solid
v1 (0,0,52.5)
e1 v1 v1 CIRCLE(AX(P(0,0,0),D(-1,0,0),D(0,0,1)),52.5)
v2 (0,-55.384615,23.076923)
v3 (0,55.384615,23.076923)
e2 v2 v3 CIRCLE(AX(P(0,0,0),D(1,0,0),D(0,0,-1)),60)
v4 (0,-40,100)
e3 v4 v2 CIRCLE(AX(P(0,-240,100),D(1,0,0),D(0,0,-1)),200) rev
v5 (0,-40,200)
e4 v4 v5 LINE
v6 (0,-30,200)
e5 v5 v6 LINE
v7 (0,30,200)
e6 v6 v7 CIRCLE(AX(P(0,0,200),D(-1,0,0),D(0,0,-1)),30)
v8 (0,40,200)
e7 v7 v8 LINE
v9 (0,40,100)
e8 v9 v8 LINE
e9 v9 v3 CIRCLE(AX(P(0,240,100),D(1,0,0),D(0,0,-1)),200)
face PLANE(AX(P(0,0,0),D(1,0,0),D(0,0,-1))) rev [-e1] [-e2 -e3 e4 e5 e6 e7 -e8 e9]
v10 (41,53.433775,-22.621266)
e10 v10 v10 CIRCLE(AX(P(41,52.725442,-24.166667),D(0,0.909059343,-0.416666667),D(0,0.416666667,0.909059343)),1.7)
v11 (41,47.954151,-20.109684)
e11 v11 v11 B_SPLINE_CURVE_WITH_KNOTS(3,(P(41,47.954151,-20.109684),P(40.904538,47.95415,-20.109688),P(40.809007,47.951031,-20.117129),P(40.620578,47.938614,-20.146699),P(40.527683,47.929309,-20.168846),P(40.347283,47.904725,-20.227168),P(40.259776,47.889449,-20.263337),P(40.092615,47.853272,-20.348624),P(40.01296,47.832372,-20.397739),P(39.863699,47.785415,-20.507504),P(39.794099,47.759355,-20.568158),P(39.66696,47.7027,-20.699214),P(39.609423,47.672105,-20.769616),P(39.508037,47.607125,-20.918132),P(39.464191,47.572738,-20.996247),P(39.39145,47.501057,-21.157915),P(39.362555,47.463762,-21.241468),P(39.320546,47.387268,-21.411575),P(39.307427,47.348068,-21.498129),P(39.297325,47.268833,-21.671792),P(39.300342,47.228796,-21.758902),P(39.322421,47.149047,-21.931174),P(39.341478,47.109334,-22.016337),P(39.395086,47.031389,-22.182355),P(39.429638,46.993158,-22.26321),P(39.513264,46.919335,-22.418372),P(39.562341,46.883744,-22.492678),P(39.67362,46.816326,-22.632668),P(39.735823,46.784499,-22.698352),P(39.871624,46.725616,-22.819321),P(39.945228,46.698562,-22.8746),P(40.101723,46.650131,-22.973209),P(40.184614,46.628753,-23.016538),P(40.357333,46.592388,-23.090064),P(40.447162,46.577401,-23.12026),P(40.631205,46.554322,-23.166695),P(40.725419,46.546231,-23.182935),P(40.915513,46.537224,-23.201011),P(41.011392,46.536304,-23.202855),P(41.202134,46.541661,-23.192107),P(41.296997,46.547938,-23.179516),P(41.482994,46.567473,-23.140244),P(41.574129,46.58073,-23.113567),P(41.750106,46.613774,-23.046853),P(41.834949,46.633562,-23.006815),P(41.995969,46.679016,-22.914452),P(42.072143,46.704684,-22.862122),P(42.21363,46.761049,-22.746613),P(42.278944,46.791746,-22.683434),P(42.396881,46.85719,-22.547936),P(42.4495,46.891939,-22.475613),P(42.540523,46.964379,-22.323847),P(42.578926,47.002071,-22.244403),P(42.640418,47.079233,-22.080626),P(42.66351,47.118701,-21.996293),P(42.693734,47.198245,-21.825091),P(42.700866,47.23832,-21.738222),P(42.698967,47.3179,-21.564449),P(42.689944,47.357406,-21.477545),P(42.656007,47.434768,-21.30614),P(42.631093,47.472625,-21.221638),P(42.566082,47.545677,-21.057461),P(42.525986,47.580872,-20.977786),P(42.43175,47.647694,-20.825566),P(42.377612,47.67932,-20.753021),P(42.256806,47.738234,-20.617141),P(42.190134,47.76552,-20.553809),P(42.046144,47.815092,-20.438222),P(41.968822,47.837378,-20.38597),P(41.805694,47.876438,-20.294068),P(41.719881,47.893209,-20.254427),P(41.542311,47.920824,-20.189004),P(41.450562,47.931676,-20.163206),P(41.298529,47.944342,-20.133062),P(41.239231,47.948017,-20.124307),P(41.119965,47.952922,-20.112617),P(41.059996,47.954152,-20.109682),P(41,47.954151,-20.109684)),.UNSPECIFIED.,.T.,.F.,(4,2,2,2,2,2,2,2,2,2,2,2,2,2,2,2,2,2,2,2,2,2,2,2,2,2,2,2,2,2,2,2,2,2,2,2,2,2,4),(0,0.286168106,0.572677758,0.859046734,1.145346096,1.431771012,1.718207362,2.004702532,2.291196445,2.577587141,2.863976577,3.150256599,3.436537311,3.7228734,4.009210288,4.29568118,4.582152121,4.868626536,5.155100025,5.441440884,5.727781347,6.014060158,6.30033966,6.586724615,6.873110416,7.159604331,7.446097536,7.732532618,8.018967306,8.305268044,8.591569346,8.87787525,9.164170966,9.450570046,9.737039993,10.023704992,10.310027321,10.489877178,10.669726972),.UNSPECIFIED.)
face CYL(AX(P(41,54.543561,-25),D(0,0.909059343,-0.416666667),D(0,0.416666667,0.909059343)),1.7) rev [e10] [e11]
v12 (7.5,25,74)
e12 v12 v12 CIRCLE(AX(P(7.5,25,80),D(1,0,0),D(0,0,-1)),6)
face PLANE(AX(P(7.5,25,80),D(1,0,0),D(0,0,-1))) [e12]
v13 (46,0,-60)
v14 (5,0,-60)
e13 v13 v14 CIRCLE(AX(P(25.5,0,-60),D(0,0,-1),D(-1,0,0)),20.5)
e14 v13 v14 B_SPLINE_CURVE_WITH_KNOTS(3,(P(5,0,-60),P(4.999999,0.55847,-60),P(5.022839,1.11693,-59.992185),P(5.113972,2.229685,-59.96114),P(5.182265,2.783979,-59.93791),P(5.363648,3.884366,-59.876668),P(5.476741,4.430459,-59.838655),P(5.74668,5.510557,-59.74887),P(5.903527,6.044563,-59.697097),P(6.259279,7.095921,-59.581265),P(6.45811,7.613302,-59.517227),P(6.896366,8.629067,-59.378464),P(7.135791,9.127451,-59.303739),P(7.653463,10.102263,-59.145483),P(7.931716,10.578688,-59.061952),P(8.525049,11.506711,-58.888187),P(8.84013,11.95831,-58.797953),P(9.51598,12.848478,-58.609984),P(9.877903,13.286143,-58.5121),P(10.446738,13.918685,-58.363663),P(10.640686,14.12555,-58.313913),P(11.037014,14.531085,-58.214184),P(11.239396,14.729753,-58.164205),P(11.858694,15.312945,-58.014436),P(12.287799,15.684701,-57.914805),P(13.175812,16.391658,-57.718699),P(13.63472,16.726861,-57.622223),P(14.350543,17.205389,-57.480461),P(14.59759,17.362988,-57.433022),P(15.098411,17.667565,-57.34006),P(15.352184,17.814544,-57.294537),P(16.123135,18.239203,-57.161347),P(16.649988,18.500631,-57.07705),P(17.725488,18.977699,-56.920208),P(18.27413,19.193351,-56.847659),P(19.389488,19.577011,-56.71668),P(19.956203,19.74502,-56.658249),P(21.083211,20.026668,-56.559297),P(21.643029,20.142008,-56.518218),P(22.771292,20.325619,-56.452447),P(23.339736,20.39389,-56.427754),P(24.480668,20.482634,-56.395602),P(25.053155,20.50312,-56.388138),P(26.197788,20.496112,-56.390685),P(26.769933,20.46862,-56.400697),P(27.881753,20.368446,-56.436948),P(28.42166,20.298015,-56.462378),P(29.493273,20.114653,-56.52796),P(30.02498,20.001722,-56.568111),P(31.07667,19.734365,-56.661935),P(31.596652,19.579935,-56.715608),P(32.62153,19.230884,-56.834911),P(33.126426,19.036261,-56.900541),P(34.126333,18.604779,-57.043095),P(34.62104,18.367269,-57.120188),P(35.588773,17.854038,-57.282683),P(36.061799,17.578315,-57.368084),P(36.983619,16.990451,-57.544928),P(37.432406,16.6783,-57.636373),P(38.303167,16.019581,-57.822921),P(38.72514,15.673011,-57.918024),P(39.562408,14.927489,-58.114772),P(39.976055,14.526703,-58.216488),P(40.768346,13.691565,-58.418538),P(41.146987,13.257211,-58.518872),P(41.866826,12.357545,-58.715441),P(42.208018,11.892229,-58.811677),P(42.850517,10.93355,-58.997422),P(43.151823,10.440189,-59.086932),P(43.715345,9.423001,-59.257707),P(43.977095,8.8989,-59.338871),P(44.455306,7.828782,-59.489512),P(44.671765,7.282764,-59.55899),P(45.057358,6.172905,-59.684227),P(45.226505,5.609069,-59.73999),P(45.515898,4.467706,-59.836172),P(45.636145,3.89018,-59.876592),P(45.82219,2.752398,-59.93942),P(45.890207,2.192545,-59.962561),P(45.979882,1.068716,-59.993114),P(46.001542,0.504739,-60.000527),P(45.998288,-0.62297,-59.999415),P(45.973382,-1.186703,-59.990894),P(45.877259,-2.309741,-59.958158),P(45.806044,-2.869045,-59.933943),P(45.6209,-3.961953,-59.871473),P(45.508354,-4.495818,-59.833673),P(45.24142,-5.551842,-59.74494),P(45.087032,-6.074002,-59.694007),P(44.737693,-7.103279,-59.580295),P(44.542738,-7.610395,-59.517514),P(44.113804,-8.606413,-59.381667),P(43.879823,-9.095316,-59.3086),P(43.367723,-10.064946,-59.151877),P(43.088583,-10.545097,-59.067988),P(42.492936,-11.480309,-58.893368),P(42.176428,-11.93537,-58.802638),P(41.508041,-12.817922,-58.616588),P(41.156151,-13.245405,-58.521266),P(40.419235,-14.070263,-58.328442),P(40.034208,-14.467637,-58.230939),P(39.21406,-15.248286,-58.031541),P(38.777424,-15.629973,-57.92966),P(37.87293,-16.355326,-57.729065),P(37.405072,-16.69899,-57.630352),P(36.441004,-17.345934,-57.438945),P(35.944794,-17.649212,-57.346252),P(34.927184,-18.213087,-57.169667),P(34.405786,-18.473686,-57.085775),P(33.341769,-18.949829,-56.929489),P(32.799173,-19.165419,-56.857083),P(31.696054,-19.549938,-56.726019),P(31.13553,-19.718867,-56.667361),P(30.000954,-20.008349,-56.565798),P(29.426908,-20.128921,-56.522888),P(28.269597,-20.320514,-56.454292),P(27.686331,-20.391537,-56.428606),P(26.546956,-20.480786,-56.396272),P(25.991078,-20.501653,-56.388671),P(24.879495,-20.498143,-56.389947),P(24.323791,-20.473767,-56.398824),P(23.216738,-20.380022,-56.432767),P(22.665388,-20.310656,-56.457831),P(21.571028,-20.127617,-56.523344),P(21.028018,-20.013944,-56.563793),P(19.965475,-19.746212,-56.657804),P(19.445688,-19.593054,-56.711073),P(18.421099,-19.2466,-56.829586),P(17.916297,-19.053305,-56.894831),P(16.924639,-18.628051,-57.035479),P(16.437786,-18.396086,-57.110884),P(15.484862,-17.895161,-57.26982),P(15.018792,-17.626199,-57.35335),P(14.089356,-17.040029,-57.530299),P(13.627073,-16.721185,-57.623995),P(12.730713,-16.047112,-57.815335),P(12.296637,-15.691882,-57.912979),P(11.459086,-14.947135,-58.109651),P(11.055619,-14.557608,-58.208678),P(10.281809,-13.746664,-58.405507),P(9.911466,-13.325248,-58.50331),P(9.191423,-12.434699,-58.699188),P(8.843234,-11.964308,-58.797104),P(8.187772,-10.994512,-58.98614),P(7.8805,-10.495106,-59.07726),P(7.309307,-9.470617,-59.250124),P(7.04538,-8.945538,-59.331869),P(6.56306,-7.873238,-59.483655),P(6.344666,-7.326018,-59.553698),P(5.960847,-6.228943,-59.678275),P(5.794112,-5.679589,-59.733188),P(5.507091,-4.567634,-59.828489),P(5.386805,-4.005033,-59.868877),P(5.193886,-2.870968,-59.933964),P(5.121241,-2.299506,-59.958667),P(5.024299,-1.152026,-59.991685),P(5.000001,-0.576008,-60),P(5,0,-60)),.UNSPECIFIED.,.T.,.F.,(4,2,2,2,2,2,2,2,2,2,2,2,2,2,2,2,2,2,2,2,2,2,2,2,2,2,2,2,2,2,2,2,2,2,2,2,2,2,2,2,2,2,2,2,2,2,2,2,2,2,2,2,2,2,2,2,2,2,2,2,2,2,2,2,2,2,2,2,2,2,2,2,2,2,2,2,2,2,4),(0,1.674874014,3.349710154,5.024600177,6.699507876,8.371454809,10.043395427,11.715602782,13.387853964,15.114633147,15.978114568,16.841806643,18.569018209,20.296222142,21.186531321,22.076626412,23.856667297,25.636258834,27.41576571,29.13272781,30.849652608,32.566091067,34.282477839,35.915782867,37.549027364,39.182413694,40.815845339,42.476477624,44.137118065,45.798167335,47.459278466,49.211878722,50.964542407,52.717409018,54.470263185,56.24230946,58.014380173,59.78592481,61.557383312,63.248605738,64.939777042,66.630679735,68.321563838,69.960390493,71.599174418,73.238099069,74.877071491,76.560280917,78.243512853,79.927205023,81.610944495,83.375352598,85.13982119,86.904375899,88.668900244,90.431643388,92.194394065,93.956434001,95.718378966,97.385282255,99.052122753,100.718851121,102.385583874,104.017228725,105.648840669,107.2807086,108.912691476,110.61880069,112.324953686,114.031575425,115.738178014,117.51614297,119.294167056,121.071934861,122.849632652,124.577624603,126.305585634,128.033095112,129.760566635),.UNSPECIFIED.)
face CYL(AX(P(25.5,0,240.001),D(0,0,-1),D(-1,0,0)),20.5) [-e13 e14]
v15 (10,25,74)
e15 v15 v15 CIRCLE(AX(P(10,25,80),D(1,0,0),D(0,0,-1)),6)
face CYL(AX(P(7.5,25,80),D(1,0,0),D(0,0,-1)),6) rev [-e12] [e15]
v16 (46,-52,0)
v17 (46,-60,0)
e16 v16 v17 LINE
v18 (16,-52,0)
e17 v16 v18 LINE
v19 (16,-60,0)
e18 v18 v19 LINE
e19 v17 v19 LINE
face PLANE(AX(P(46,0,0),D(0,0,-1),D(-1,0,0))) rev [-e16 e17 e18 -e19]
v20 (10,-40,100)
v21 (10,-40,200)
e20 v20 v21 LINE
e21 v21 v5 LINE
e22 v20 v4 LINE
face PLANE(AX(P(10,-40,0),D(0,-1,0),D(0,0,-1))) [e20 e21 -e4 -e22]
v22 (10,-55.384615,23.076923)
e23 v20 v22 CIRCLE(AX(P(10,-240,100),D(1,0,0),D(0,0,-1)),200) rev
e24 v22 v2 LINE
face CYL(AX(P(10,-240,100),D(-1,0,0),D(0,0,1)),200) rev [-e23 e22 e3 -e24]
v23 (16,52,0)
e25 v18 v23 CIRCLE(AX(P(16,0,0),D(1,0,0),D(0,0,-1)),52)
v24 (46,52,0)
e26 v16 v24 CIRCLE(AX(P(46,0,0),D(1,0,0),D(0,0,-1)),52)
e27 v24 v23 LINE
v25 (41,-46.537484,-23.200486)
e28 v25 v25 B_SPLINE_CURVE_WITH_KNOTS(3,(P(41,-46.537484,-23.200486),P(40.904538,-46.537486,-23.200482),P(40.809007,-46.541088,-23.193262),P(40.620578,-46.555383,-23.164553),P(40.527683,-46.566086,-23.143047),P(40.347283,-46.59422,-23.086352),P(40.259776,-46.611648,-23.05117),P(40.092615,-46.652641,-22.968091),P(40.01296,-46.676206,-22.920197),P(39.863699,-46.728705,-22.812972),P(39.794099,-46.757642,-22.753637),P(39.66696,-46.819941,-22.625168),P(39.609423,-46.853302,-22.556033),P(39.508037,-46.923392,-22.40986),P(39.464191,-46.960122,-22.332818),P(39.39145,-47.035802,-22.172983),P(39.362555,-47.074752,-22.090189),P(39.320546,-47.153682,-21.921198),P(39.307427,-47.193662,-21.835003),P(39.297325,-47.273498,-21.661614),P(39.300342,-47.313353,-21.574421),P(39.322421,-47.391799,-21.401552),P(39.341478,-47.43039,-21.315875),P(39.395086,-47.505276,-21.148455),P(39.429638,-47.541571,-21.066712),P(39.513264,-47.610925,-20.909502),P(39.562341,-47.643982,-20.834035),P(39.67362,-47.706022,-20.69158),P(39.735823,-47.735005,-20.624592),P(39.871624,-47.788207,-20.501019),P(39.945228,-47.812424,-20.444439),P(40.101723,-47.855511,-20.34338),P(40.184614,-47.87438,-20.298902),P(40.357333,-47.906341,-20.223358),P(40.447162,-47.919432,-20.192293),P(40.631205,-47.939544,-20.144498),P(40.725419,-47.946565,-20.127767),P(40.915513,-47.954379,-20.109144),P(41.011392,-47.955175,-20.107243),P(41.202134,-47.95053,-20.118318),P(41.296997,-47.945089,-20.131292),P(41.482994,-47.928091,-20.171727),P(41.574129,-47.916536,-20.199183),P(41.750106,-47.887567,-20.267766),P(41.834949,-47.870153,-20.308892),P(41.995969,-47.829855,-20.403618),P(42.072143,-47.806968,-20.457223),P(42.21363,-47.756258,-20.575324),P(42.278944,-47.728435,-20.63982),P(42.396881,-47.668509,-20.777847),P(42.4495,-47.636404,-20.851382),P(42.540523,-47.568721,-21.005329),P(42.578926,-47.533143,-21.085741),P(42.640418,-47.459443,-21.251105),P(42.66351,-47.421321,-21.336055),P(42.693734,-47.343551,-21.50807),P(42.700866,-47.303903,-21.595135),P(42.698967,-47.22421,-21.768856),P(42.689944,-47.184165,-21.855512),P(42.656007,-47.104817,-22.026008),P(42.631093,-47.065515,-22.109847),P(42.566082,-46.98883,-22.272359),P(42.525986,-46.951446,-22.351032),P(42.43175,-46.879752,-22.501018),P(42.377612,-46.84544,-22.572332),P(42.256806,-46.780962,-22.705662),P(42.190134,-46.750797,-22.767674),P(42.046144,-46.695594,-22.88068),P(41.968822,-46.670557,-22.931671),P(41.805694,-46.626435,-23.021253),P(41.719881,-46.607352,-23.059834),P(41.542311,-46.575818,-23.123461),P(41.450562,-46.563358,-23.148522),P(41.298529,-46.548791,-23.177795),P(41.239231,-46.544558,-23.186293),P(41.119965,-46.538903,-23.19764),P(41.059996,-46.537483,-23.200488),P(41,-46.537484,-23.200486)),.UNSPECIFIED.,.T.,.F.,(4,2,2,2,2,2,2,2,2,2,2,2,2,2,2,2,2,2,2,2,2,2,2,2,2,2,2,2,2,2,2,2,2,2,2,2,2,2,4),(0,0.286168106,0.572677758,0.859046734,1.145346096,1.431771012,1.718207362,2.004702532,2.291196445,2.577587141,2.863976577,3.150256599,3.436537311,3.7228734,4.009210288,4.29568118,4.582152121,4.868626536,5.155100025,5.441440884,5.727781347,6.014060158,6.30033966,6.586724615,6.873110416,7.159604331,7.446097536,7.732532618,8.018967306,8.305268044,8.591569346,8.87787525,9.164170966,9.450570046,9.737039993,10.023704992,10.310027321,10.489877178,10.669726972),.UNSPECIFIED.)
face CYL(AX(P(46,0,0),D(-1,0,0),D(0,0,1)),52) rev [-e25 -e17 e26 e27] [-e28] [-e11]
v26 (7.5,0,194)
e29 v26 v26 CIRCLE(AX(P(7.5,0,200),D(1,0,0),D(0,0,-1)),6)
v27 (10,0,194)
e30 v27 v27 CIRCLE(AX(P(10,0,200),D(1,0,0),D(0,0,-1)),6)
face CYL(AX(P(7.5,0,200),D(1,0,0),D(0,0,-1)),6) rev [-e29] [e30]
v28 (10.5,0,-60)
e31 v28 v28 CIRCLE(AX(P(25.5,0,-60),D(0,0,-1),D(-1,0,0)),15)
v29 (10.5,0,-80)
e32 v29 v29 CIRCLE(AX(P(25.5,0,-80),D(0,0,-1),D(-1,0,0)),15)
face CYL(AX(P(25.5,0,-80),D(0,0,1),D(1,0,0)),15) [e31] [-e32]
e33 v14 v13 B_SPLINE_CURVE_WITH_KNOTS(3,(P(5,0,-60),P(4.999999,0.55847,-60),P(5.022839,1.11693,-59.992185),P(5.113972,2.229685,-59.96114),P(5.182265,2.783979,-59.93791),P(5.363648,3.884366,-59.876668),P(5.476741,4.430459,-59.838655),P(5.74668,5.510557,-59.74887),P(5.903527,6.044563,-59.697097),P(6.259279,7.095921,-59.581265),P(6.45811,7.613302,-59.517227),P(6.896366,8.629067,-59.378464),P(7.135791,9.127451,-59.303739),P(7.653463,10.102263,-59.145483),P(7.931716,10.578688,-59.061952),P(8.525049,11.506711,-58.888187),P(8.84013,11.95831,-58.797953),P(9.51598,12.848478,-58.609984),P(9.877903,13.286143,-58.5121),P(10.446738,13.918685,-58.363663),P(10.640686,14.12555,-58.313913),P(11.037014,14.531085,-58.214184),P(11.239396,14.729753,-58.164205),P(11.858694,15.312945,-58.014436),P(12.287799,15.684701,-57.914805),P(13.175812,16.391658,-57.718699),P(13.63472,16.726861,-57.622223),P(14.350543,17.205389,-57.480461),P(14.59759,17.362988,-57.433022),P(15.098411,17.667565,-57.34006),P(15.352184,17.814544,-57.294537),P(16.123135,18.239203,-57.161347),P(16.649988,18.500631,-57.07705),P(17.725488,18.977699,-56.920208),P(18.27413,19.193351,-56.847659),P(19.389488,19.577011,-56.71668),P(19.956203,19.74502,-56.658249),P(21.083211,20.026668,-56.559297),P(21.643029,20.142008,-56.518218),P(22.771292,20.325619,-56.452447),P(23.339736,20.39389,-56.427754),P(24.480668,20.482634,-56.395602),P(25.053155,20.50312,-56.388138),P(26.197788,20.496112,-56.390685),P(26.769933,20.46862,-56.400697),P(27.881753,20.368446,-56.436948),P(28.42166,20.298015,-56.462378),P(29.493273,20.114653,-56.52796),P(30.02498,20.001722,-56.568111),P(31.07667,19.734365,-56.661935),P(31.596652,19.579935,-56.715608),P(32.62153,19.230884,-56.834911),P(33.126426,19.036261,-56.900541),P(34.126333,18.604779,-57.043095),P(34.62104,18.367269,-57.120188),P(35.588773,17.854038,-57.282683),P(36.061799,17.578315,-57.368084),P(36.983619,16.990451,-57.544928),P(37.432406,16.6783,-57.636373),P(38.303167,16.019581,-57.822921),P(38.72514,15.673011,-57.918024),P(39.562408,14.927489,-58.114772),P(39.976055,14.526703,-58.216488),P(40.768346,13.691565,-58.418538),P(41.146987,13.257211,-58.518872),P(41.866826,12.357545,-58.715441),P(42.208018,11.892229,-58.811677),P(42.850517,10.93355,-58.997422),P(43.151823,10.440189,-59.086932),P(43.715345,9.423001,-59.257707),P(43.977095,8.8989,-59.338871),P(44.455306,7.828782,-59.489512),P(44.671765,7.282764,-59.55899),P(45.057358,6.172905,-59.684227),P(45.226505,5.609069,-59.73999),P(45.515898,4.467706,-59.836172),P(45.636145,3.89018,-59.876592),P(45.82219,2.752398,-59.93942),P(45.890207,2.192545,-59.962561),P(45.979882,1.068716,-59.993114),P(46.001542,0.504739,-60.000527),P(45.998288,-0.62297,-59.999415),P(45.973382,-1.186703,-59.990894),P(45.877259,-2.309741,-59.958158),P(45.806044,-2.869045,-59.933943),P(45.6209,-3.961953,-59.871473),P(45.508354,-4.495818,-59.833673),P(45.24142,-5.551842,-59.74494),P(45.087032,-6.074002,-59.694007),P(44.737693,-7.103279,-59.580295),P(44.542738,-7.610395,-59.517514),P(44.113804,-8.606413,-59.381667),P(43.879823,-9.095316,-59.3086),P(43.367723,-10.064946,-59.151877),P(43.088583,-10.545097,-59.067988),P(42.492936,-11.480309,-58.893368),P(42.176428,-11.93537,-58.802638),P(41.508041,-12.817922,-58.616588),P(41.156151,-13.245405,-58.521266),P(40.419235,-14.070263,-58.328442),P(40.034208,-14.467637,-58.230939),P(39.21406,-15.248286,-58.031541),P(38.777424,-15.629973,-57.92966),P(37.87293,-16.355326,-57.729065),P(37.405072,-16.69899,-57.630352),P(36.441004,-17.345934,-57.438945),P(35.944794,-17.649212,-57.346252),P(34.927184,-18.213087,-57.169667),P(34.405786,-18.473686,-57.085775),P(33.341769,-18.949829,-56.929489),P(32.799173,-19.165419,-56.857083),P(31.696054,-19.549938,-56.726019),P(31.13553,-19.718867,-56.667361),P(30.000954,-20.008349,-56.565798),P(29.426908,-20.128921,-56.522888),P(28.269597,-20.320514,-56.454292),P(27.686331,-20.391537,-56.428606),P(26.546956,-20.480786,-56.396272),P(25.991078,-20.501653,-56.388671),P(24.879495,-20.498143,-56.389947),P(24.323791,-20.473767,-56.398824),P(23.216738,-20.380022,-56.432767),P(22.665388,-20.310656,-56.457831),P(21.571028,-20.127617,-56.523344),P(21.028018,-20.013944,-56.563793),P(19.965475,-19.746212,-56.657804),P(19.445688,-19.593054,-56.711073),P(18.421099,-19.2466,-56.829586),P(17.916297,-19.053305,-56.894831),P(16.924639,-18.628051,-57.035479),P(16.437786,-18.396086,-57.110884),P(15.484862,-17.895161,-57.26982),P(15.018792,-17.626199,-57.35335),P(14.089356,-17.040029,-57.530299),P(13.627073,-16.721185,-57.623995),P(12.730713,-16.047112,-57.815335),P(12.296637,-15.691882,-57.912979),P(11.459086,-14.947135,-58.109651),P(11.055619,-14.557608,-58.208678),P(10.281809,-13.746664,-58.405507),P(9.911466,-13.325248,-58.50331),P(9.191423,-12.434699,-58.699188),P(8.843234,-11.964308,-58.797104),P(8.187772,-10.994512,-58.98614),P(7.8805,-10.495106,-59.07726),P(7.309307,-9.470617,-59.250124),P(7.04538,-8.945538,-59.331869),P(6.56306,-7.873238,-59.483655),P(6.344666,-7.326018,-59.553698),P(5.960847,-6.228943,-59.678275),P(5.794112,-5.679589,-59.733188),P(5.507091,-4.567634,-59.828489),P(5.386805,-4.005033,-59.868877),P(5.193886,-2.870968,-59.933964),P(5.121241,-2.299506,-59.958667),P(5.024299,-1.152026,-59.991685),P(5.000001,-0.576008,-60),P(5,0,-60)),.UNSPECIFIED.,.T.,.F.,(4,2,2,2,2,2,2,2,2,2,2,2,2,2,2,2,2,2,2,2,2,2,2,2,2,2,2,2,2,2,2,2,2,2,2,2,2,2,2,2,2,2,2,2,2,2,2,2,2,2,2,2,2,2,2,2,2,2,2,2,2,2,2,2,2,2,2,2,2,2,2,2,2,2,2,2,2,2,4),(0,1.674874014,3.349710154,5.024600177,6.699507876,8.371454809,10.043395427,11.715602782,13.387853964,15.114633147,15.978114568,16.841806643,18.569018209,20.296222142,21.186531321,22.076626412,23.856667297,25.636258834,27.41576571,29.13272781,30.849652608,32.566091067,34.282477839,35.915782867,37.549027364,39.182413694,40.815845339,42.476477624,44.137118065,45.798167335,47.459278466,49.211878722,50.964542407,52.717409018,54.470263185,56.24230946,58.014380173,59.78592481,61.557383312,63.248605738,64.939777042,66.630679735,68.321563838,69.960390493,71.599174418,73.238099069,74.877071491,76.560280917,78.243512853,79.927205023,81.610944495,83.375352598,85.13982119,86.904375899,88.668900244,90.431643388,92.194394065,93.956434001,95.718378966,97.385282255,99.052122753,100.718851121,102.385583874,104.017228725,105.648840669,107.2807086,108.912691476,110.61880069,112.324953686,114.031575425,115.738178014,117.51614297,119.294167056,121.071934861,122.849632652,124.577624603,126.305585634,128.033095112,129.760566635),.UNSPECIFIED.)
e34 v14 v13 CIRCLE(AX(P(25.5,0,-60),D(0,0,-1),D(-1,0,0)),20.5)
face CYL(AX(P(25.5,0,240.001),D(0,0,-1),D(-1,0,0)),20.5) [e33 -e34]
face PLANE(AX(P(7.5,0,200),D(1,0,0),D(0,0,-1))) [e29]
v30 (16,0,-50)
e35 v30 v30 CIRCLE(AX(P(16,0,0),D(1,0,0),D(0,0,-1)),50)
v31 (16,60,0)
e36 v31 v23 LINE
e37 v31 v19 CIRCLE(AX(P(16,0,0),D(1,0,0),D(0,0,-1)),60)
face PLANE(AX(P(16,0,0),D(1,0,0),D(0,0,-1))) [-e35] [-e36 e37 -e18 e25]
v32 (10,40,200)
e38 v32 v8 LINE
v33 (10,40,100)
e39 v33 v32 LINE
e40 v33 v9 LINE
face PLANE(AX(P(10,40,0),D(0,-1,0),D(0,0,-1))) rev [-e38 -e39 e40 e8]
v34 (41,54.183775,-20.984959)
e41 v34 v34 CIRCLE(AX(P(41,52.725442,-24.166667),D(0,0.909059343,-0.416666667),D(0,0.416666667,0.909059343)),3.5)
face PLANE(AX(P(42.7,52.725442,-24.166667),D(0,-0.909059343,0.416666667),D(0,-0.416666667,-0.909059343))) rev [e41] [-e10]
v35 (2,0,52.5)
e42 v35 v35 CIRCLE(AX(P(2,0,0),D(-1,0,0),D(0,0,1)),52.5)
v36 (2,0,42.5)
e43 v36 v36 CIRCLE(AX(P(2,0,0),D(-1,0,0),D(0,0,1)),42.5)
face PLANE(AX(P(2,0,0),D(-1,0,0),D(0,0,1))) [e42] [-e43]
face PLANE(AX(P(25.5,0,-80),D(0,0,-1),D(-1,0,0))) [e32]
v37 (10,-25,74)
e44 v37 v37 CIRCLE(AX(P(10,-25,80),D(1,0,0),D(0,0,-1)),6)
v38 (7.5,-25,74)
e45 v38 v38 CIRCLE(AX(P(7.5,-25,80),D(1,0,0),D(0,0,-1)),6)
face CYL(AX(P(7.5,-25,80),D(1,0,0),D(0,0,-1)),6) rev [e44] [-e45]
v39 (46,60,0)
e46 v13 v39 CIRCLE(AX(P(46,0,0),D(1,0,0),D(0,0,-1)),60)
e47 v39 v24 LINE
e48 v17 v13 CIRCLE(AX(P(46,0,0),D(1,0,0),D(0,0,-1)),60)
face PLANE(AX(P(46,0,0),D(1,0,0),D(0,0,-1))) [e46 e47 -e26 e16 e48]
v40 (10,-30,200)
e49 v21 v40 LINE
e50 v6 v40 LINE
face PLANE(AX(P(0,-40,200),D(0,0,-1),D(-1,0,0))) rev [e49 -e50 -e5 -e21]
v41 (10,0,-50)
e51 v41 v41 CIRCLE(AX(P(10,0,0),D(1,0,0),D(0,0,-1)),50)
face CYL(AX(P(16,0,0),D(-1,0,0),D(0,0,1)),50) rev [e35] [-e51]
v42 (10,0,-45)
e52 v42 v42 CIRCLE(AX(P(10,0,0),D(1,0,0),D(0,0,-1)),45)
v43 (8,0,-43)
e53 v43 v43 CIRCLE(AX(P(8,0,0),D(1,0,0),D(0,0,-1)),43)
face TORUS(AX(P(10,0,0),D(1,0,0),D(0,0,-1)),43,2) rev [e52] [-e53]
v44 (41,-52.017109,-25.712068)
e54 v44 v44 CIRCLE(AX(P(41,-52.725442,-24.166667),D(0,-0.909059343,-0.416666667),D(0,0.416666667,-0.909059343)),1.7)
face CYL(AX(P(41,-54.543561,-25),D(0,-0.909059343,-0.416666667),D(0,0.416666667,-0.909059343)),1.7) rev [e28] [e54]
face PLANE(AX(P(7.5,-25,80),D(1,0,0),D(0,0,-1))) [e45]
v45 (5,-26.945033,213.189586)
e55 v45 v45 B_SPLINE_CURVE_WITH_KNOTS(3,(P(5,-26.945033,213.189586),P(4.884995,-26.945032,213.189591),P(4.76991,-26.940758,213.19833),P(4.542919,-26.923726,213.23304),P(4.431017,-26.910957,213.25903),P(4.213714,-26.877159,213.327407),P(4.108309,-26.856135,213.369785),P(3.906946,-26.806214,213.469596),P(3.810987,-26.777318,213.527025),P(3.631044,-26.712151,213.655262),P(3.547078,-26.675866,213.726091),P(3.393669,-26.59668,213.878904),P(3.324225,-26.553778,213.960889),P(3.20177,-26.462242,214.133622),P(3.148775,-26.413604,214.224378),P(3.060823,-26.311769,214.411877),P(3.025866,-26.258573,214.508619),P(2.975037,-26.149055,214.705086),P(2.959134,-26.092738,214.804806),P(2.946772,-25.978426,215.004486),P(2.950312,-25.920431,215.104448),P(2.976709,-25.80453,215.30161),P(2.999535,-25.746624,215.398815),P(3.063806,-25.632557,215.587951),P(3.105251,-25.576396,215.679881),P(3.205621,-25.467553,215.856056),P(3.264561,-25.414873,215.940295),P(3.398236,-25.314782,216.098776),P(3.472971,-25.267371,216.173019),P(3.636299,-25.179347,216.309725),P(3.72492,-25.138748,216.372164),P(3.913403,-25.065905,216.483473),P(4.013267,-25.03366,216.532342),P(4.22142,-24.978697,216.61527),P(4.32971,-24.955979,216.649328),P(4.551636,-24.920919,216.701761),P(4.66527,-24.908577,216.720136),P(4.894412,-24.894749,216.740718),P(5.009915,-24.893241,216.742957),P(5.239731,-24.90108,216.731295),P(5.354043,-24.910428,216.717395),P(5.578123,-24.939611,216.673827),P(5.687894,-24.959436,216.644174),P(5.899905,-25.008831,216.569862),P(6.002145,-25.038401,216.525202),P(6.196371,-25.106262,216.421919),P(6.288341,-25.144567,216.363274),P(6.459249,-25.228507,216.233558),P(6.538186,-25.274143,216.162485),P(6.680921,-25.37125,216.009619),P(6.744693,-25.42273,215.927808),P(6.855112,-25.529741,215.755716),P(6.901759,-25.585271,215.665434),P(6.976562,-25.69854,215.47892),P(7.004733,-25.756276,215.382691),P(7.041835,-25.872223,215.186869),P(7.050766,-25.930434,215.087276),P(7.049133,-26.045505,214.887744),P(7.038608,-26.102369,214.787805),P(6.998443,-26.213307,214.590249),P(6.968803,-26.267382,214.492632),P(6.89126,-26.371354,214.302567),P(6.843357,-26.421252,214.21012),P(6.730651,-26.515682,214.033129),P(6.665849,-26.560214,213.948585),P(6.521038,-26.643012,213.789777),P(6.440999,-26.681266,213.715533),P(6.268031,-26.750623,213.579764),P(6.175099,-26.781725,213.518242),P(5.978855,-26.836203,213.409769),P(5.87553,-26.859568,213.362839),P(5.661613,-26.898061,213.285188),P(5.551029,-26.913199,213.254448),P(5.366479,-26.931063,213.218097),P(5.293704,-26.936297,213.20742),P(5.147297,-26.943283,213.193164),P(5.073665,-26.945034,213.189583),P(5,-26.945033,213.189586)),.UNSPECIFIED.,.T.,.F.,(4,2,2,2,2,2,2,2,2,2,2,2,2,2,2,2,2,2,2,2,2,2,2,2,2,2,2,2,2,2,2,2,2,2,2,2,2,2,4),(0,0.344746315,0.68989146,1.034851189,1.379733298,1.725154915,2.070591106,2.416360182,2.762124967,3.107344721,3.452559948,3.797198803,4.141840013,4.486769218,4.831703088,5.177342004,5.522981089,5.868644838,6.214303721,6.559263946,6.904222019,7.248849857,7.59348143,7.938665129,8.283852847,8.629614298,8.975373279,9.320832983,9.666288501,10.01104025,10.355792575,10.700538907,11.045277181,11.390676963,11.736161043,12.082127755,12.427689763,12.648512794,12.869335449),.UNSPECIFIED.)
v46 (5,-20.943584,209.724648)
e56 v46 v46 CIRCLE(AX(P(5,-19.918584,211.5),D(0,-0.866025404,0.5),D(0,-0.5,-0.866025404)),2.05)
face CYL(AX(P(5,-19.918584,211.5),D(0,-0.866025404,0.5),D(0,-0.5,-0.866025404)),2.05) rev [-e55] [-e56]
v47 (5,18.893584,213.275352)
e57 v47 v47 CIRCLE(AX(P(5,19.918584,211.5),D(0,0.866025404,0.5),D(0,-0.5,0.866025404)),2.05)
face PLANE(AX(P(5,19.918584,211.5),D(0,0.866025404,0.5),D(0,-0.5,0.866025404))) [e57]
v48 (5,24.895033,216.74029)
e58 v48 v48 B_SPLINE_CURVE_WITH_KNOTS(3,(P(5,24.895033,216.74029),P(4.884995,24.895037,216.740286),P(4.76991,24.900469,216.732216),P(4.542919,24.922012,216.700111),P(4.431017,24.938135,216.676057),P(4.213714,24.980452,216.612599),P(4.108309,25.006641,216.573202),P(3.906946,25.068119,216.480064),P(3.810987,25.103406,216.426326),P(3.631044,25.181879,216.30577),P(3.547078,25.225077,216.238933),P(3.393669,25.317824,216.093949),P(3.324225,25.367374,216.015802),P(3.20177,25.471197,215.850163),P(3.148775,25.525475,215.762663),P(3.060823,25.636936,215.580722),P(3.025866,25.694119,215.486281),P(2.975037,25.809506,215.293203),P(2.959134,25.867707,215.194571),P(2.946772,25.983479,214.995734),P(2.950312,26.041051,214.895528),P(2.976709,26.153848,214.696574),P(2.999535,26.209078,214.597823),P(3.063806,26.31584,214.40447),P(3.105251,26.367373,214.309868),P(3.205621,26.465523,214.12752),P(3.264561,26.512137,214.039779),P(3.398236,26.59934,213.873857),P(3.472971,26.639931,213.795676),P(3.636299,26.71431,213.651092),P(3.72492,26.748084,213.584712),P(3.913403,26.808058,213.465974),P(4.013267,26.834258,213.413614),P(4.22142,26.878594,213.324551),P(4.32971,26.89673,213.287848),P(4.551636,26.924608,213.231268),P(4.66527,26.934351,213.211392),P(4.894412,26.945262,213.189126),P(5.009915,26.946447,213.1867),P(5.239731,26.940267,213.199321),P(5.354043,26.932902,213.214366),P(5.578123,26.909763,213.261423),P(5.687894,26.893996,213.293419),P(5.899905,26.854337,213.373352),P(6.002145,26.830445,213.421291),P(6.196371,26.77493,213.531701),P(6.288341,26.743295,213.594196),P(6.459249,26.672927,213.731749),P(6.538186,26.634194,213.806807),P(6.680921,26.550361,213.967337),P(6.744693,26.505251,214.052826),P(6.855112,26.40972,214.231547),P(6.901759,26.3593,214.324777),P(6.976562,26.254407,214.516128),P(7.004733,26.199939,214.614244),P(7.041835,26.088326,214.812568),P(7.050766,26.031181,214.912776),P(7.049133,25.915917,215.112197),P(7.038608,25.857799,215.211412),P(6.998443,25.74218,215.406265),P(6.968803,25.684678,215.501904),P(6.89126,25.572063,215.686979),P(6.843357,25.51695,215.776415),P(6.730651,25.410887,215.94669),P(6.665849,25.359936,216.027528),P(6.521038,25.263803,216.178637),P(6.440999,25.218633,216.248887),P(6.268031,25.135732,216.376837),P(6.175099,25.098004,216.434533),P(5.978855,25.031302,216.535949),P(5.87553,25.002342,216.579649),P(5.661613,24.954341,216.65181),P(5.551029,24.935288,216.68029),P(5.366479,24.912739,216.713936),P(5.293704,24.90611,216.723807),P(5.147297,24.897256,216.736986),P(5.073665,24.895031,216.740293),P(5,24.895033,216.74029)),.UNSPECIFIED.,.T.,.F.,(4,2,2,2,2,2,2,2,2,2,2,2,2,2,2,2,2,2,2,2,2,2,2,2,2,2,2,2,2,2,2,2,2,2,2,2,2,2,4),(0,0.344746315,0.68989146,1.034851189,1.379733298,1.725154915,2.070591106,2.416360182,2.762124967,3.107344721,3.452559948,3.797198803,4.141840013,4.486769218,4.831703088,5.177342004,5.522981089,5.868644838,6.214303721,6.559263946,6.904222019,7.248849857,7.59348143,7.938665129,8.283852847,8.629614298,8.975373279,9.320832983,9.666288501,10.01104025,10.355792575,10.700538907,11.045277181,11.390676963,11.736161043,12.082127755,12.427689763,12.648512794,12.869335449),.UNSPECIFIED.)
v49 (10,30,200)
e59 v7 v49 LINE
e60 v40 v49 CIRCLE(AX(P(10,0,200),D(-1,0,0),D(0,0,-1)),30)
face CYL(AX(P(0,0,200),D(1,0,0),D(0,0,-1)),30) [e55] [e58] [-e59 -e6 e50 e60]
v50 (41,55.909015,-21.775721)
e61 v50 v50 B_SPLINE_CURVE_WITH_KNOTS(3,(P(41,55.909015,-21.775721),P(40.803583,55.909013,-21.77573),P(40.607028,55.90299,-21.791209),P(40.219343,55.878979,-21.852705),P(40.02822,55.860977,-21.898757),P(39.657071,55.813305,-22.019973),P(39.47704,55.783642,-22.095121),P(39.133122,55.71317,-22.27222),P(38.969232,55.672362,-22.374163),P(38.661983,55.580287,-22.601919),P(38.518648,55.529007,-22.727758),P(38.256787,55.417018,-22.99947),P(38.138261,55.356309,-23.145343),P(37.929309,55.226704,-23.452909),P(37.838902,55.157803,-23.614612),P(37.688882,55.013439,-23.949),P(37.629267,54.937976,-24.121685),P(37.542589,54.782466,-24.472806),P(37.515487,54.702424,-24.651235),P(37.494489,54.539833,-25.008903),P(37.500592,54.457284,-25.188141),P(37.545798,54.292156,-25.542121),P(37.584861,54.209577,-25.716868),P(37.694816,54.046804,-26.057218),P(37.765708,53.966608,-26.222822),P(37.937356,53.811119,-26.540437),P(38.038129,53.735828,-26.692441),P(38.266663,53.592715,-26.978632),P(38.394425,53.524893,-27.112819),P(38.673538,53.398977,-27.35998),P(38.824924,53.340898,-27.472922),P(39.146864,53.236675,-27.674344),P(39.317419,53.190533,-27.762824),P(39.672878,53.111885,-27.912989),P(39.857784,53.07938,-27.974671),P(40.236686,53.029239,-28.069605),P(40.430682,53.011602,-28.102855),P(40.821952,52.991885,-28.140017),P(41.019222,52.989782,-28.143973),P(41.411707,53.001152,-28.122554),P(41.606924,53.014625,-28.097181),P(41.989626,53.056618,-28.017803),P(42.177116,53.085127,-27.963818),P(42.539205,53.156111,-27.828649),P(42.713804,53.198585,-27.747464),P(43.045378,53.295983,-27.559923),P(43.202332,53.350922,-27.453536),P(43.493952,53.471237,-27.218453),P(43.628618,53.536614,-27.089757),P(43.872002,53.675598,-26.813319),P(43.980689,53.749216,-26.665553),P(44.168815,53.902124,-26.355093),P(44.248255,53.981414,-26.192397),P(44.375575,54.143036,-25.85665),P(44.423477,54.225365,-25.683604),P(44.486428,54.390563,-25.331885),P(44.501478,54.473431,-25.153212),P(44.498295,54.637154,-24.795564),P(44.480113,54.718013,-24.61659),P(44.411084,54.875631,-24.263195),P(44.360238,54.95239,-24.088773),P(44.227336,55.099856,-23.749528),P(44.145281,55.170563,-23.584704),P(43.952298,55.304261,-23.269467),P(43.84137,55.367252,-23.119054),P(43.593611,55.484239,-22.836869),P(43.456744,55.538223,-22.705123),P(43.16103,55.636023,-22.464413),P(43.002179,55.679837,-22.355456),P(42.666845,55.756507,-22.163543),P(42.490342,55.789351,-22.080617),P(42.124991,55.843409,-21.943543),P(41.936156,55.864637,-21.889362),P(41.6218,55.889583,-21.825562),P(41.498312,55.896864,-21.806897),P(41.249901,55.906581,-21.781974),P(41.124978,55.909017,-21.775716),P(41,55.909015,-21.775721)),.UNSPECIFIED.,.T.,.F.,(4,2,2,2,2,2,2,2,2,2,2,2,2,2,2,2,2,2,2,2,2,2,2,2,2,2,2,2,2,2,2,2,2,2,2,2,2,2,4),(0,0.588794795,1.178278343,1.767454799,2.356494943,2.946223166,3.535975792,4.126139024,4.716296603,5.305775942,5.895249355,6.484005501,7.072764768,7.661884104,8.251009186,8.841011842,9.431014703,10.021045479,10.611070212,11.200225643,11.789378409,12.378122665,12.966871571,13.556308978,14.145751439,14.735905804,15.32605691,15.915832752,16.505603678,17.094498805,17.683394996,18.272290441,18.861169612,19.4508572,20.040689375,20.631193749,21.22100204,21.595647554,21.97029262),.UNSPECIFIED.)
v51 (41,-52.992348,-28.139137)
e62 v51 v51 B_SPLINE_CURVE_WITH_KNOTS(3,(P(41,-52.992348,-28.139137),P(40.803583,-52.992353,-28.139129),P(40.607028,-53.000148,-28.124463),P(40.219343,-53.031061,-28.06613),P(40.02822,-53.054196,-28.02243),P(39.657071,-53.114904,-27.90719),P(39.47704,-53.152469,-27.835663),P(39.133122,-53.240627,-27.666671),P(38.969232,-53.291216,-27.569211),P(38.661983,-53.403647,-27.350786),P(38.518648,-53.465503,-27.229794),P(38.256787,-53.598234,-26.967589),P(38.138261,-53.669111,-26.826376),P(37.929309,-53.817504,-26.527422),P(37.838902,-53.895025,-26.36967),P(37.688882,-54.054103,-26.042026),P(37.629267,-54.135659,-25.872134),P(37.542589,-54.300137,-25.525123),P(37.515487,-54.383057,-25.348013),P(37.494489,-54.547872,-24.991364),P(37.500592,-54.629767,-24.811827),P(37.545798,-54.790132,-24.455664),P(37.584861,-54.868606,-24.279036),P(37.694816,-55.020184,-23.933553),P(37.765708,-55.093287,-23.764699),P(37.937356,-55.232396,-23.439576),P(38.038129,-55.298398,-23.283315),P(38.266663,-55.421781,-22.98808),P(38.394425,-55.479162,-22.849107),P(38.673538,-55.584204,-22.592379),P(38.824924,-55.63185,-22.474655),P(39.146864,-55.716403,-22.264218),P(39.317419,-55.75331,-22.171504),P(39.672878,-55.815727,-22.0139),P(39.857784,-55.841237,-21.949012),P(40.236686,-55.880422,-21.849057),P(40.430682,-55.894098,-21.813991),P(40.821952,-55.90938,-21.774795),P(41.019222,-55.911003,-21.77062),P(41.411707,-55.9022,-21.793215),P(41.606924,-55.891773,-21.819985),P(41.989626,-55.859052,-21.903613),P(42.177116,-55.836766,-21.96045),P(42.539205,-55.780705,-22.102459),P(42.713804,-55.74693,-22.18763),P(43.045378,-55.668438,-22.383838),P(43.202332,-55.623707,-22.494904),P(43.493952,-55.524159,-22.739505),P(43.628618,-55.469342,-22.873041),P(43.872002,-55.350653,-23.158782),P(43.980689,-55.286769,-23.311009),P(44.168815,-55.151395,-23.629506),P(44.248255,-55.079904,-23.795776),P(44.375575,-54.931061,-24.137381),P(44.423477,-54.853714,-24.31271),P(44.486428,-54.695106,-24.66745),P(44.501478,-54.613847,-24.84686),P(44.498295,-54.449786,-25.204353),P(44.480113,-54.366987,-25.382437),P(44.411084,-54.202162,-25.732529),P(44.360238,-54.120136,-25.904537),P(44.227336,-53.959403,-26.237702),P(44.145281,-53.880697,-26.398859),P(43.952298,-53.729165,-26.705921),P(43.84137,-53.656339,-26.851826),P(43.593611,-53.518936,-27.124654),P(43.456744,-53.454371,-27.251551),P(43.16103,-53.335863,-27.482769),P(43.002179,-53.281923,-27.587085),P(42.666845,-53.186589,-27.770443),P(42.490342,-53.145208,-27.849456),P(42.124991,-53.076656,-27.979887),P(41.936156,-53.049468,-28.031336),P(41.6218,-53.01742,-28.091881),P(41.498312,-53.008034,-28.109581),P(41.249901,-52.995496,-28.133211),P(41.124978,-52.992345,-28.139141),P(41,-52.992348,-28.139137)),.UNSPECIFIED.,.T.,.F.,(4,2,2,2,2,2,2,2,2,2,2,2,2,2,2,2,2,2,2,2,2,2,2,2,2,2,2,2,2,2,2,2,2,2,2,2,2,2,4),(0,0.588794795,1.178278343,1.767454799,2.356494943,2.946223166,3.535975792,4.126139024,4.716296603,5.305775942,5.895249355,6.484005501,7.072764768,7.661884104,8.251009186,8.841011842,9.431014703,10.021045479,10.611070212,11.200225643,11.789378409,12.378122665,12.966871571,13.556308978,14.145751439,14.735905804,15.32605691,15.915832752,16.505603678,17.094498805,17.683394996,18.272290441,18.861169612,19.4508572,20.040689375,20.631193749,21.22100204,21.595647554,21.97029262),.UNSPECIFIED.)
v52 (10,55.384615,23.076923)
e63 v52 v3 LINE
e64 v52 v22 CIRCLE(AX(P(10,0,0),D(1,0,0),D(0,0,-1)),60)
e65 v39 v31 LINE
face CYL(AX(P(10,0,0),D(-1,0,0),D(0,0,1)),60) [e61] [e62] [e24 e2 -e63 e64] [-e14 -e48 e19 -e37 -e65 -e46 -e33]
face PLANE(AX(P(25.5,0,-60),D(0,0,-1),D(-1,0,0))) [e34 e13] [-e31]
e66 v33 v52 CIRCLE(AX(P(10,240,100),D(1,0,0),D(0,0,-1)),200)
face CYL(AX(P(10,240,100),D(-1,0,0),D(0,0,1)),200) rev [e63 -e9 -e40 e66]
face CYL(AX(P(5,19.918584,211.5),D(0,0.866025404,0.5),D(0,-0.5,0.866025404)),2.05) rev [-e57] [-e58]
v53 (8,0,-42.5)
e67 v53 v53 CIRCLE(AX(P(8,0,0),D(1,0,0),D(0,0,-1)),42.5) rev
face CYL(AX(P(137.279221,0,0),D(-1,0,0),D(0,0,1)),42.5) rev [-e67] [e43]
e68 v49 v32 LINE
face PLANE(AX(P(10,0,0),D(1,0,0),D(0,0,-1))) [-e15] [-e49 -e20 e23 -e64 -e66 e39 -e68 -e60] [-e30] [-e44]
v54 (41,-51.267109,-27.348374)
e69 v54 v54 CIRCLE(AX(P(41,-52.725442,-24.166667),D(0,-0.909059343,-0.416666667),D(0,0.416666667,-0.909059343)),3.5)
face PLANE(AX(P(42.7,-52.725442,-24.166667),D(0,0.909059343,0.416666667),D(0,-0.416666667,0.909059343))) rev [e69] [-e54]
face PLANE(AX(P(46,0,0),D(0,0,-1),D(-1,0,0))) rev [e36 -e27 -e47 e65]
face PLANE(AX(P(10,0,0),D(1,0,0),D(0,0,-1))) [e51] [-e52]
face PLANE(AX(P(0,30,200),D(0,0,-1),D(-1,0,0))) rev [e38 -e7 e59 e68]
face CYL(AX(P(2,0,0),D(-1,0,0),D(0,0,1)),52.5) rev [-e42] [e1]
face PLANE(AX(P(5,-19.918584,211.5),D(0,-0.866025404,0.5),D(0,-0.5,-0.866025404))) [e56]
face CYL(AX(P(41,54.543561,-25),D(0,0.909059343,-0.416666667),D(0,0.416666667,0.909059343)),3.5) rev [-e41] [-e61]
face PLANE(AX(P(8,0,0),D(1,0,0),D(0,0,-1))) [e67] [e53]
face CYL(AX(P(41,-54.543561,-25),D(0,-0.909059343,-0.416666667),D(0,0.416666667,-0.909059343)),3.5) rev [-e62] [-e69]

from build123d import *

# Parameters (mm, degrees)
SKETCH1_R                                            = 60
SKETCH1_R_2                                          = 45
SKETCH1_R_3                                          = 40
BOSS_EXTRUDE3_DEPTH                                  = 10
SKETCH4_R                                            = 60
SKETCH4_R_2                                          = 50
BOSS_EXTRUDE4_DEPTH                                  = 6
SKETCH5_R                                            = 45
SKETCH5_R_2                                          = 42.5
BOSS_EXTRUDE5_DEPTH                                  = 8
FILLET1_R                                            = 2
SKETCH6_R                                            = 52.5
SKETCH6_R_2                                          = 42.5
CUT_EXTRUDE2_DEPTH                                   = 2
BOSS_EXTRUDE6_DEPTH                                  = 30
BOSS_EXTRUDE7_REACH                                  = 311.38
SKETCH8_R                                            = 20.5
SKETCH9_R                                            = 15
BOSS_EXTRUDE8_DEPTH                                  = 20
CUT_EXTRUDE3_DEPTH                                   = 250.99199991
CBORE_FOR_M3_HEXAGON_HEAD_BOLTS_FULL_THR_D           = 3.4
CBORE_FOR_M3_HEXAGON_HEAD_BOLTS_FULL_THR_CBORE_D     = 7
CBORE_FOR_M3_HEXAGON_HEAD_BOLTS_FULL_THR_CBORE_DEPTH = 2
CBORE_FOR_M3_HEXAGON_HEAD_BOLTS_FULL_2_D             = 3.4
CBORE_FOR_M3_HEXAGON_HEAD_BOLTS_FULL_2_CBORE_D       = 7
CBORE_FOR_M3_HEXAGON_HEAD_BOLTS_FULL_2_CBORE_DEPTH   = 2
SKETCH17_R                                           = 2.05
CUT_EXTRUDE4_DEPTH                                   = 15
SKETCH18_R                                           = 2.05
CUT_EXTRUDE5_DEPTH                                   = 15
SKETCH19_R                                           = 6
CUT_EXTRUDE6_DEPTH                                   = 2.5
SKETCH20_R                                           = 6
CUT_EXTRUDE7_DEPTH                                   = 2.5


with BuildPart() as part:
    # Sketch1 → Boss-Extrude3 (new body)
    # profile 1 of 3: a face of its own
    with BuildSketch(Plane(origin=(0, 0, 0), x_dir=(0, 0, -1), z_dir=(1, 0, 0))):
        Circle(SKETCH1_R)
        Circle(SKETCH1_R_2, mode=Mode.SUBTRACT)
    # profile 2 of 3: a face of its own
    with BuildSketch(Plane(origin=(0, 0, 0), x_dir=(0, 0, -1), z_dir=(1, 0, 0))):
        with BuildLine():
            ThreePointArc((-23.076923077, 55.384615385), (-60.776772972, 43.883864862), (-100, 40))
            Line((-100, 40), (-200, 40))
            ThreePointArc((-200, 40), (-171.715728753, 28.284271247), (-160, 0))
            ThreePointArc((-160, 0), (-171.715728753, -28.284271247), (-200, -40))
            Line((-200, -40), (-100, -40))
            ThreePointArc((-100, -40), (-60.776772972, -43.883864862), (-23.076923077, -55.384615385))
            ThreePointArc((-23.076923077, -55.384615385), (-60, 0), (-23.076923077, 55.384615385))
        make_face()
    # profile 3 of 3: a face of its own
    with BuildSketch(Plane(origin=(0, 0, 0), x_dir=(0, 0, -1), z_dir=(1, 0, 0))):
        with Locations((-200, 0)):
            Circle(SKETCH1_R_3)
    extrude(amount=BOSS_EXTRUDE3_DEPTH)

    # Sketch4 → Boss-Extrude4 (add)
    with BuildSketch(Plane(origin=(10, 0, 0), x_dir=(0, 0, -1), z_dir=(1, 0, 0))):
        with Locations(Location((0, 0, 0), (0, 0, 112.619864948))):
            Circle(SKETCH4_R)
        Circle(SKETCH4_R_2, mode=Mode.SUBTRACT)
    extrude(amount=BOSS_EXTRUDE4_DEPTH)

    # Sketch5 → Boss-Extrude5 (add)
    with BuildSketch(Plane.ZY):
        with Locations(Location((0, 0, 0), (0, 0, 180))):
            Circle(SKETCH5_R)
        Circle(SKETCH5_R_2, mode=Mode.SUBTRACT)
    extrude(amount=-BOSS_EXTRUDE5_DEPTH)

    # Fillet1
    fillet1_edges = [part.edges().sort_by_distance(p)[0] for p in [
        (8, 0, 45),
    ]]
    fillet(fillet1_edges, radius=FILLET1_R - 0.0001)  # a hair under: the kernel refuses the full size

    # Sketch6 → Cut-Extrude2 (cut)
    with BuildSketch(Plane.ZY):
        Circle(SKETCH6_R)
        Circle(SKETCH6_R_2, mode=Mode.SUBTRACT)
    extrude(amount=-CUT_EXTRUDE2_DEPTH, mode=Mode.SUBTRACT)

    # Sketch7 → Boss-Extrude6 (add)
    with BuildSketch(Plane(origin=(16, 0, 0), x_dir=(0, 0, -1), z_dir=(1, 0, 0))):
        with BuildLine():
            ThreePointArc((60, 0), (42.426406871, 42.426406871), (0, 60))
            Line((0, 60), (0, 52))
            ThreePointArc((0, 52), (52, 0), (0, -52))
            Line((0, -52), (0, -60))
            ThreePointArc((0, -60), (42.426406871, -42.426406871), (60, 0))
        make_face()
    extrude(amount=BOSS_EXTRUDE6_DEPTH)

    # Sketch8 → Boss-Extrude7 (add, up to next)
    with BuildSketch(Plane(origin=(0, 0, -60), x_dir=(-1, 0, 0), z_dir=(0, 0, -1)), mode=Mode.PRIVATE) as boss_extrude7_sk1:
        with Locations((-25.5, 0)):
            Circle(SKETCH8_R)
    boss_extrude7_tool1 = extrude(boss_extrude7_sk1.sketch, amount=-BOSS_EXTRUDE7_REACH, mode=Mode.PRIVATE) - part.part
    add(boss_extrude7_tool1.solids().sort_by_distance((25.5, 0, -60))[0])
    add(boss_extrude7_tool1.solids().sort_by_distance((25.5, 0, -60))[1])

    # Sketch9 → Boss-Extrude8 (add)
    with BuildSketch(Plane(origin=(0, 0, -60), x_dir=(-1, 0, 0), z_dir=(0, 0, -1))):
        with Locations((-25.5, 0)):
            Circle(SKETCH9_R)
    extrude(amount=BOSS_EXTRUDE8_DEPTH)

    # Sketch12 → Cut-Extrude3 (cut, through all)
    with BuildSketch(Plane(origin=(10, 0, 0), x_dir=(0, 0, -1), z_dir=(1, 0, 0))):
        with BuildLine():
            Line((-200, 30), (-200, 40))
            ThreePointArc((-200, 40), (-240, 0), (-200, -40))
            Line((-200, -40), (-200, -30))
            ThreePointArc((-200, -30), (-230, 0), (-200, 30))
        make_face()
    extrude(amount=-CUT_EXTRUDE3_DEPTH, mode=Mode.SUBTRACT)

    # CBORE for M3 Hexagon head bolts-Full thread-grades AB2 (through all)
    with Locations(Plane(origin=(41, 54.543560573, -25), x_dir=(0, 0.416666666667, 0.909059342886), z_dir=(0, 0.909059342886, -0.416666666667))):
        with Locations((0, 0)):
            CounterBoreHole(CBORE_FOR_M3_HEXAGON_HEAD_BOLTS_FULL_THR_D / 2, CBORE_FOR_M3_HEXAGON_HEAD_BOLTS_FULL_THR_CBORE_D / 2, CBORE_FOR_M3_HEXAGON_HEAD_BOLTS_FULL_THR_CBORE_DEPTH)

    # CBORE for M3 Hexagon head bolts-Full 2 (through all)
    with Locations(Plane(origin=(41, -54.543560573, -25), x_dir=(0, 0.416667072006, -0.909059157099), z_dir=(0, -0.909059157099, -0.416667072006))):
        with Locations((0, 0)):
            CounterBoreHole(CBORE_FOR_M3_HEXAGON_HEAD_BOLTS_FULL_2_D / 2, CBORE_FOR_M3_HEXAGON_HEAD_BOLTS_FULL_2_CBORE_D / 2, CBORE_FOR_M3_HEXAGON_HEAD_BOLTS_FULL_2_CBORE_DEPTH)

    # Sketch17 → Cut-Extrude4 (cut)
    with BuildSketch(Plane(origin=(0, -119.511505722, 69), x_dir=(-1, 0, 0), z_dir=(0, -0.8660254037844414, 0.49999999999999517))):
        with Locations(Location((-5, -173.205080757, 0), (0, 0, 90))):
            Circle(SKETCH17_R)
    extrude(amount=-CUT_EXTRUDE4_DEPTH, mode=Mode.SUBTRACT)

    # Sketch18 → Cut-Extrude5 (cut)
    with BuildSketch(Plane(origin=(0, 119.511505722, 69), x_dir=(1, 0, 0), z_dir=(0, 0.8660254037844414, 0.49999999999999517))):
        with Locations(Location((5, -173.205080757, 0), (0, 0, 270))):
            Circle(SKETCH18_R)
    extrude(amount=-CUT_EXTRUDE5_DEPTH, mode=Mode.SUBTRACT)

    # Sketch19 → Cut-Extrude6 (cut)
    with BuildSketch(Plane(origin=(10, 0, 0), x_dir=(0, 0, -1), z_dir=(1, 0, 0))):
        with Locations((-200, 0)):
            Circle(SKETCH19_R)
    extrude(amount=-CUT_EXTRUDE6_DEPTH, mode=Mode.SUBTRACT)

    # Sketch20 → Cut-Extrude7 (cut)
    with BuildSketch(Plane(origin=(10, 0, 0), x_dir=(0, 0, -1), z_dir=(1, 0, 0))):
        with Locations((-80, -25)):
            Circle(SKETCH20_R)
        with Locations((-80, 25)):
            Circle(SKETCH20_R)
    extrude(amount=-CUT_EXTRUDE7_DEPTH, mode=Mode.SUBTRACT)


solid = part.part
